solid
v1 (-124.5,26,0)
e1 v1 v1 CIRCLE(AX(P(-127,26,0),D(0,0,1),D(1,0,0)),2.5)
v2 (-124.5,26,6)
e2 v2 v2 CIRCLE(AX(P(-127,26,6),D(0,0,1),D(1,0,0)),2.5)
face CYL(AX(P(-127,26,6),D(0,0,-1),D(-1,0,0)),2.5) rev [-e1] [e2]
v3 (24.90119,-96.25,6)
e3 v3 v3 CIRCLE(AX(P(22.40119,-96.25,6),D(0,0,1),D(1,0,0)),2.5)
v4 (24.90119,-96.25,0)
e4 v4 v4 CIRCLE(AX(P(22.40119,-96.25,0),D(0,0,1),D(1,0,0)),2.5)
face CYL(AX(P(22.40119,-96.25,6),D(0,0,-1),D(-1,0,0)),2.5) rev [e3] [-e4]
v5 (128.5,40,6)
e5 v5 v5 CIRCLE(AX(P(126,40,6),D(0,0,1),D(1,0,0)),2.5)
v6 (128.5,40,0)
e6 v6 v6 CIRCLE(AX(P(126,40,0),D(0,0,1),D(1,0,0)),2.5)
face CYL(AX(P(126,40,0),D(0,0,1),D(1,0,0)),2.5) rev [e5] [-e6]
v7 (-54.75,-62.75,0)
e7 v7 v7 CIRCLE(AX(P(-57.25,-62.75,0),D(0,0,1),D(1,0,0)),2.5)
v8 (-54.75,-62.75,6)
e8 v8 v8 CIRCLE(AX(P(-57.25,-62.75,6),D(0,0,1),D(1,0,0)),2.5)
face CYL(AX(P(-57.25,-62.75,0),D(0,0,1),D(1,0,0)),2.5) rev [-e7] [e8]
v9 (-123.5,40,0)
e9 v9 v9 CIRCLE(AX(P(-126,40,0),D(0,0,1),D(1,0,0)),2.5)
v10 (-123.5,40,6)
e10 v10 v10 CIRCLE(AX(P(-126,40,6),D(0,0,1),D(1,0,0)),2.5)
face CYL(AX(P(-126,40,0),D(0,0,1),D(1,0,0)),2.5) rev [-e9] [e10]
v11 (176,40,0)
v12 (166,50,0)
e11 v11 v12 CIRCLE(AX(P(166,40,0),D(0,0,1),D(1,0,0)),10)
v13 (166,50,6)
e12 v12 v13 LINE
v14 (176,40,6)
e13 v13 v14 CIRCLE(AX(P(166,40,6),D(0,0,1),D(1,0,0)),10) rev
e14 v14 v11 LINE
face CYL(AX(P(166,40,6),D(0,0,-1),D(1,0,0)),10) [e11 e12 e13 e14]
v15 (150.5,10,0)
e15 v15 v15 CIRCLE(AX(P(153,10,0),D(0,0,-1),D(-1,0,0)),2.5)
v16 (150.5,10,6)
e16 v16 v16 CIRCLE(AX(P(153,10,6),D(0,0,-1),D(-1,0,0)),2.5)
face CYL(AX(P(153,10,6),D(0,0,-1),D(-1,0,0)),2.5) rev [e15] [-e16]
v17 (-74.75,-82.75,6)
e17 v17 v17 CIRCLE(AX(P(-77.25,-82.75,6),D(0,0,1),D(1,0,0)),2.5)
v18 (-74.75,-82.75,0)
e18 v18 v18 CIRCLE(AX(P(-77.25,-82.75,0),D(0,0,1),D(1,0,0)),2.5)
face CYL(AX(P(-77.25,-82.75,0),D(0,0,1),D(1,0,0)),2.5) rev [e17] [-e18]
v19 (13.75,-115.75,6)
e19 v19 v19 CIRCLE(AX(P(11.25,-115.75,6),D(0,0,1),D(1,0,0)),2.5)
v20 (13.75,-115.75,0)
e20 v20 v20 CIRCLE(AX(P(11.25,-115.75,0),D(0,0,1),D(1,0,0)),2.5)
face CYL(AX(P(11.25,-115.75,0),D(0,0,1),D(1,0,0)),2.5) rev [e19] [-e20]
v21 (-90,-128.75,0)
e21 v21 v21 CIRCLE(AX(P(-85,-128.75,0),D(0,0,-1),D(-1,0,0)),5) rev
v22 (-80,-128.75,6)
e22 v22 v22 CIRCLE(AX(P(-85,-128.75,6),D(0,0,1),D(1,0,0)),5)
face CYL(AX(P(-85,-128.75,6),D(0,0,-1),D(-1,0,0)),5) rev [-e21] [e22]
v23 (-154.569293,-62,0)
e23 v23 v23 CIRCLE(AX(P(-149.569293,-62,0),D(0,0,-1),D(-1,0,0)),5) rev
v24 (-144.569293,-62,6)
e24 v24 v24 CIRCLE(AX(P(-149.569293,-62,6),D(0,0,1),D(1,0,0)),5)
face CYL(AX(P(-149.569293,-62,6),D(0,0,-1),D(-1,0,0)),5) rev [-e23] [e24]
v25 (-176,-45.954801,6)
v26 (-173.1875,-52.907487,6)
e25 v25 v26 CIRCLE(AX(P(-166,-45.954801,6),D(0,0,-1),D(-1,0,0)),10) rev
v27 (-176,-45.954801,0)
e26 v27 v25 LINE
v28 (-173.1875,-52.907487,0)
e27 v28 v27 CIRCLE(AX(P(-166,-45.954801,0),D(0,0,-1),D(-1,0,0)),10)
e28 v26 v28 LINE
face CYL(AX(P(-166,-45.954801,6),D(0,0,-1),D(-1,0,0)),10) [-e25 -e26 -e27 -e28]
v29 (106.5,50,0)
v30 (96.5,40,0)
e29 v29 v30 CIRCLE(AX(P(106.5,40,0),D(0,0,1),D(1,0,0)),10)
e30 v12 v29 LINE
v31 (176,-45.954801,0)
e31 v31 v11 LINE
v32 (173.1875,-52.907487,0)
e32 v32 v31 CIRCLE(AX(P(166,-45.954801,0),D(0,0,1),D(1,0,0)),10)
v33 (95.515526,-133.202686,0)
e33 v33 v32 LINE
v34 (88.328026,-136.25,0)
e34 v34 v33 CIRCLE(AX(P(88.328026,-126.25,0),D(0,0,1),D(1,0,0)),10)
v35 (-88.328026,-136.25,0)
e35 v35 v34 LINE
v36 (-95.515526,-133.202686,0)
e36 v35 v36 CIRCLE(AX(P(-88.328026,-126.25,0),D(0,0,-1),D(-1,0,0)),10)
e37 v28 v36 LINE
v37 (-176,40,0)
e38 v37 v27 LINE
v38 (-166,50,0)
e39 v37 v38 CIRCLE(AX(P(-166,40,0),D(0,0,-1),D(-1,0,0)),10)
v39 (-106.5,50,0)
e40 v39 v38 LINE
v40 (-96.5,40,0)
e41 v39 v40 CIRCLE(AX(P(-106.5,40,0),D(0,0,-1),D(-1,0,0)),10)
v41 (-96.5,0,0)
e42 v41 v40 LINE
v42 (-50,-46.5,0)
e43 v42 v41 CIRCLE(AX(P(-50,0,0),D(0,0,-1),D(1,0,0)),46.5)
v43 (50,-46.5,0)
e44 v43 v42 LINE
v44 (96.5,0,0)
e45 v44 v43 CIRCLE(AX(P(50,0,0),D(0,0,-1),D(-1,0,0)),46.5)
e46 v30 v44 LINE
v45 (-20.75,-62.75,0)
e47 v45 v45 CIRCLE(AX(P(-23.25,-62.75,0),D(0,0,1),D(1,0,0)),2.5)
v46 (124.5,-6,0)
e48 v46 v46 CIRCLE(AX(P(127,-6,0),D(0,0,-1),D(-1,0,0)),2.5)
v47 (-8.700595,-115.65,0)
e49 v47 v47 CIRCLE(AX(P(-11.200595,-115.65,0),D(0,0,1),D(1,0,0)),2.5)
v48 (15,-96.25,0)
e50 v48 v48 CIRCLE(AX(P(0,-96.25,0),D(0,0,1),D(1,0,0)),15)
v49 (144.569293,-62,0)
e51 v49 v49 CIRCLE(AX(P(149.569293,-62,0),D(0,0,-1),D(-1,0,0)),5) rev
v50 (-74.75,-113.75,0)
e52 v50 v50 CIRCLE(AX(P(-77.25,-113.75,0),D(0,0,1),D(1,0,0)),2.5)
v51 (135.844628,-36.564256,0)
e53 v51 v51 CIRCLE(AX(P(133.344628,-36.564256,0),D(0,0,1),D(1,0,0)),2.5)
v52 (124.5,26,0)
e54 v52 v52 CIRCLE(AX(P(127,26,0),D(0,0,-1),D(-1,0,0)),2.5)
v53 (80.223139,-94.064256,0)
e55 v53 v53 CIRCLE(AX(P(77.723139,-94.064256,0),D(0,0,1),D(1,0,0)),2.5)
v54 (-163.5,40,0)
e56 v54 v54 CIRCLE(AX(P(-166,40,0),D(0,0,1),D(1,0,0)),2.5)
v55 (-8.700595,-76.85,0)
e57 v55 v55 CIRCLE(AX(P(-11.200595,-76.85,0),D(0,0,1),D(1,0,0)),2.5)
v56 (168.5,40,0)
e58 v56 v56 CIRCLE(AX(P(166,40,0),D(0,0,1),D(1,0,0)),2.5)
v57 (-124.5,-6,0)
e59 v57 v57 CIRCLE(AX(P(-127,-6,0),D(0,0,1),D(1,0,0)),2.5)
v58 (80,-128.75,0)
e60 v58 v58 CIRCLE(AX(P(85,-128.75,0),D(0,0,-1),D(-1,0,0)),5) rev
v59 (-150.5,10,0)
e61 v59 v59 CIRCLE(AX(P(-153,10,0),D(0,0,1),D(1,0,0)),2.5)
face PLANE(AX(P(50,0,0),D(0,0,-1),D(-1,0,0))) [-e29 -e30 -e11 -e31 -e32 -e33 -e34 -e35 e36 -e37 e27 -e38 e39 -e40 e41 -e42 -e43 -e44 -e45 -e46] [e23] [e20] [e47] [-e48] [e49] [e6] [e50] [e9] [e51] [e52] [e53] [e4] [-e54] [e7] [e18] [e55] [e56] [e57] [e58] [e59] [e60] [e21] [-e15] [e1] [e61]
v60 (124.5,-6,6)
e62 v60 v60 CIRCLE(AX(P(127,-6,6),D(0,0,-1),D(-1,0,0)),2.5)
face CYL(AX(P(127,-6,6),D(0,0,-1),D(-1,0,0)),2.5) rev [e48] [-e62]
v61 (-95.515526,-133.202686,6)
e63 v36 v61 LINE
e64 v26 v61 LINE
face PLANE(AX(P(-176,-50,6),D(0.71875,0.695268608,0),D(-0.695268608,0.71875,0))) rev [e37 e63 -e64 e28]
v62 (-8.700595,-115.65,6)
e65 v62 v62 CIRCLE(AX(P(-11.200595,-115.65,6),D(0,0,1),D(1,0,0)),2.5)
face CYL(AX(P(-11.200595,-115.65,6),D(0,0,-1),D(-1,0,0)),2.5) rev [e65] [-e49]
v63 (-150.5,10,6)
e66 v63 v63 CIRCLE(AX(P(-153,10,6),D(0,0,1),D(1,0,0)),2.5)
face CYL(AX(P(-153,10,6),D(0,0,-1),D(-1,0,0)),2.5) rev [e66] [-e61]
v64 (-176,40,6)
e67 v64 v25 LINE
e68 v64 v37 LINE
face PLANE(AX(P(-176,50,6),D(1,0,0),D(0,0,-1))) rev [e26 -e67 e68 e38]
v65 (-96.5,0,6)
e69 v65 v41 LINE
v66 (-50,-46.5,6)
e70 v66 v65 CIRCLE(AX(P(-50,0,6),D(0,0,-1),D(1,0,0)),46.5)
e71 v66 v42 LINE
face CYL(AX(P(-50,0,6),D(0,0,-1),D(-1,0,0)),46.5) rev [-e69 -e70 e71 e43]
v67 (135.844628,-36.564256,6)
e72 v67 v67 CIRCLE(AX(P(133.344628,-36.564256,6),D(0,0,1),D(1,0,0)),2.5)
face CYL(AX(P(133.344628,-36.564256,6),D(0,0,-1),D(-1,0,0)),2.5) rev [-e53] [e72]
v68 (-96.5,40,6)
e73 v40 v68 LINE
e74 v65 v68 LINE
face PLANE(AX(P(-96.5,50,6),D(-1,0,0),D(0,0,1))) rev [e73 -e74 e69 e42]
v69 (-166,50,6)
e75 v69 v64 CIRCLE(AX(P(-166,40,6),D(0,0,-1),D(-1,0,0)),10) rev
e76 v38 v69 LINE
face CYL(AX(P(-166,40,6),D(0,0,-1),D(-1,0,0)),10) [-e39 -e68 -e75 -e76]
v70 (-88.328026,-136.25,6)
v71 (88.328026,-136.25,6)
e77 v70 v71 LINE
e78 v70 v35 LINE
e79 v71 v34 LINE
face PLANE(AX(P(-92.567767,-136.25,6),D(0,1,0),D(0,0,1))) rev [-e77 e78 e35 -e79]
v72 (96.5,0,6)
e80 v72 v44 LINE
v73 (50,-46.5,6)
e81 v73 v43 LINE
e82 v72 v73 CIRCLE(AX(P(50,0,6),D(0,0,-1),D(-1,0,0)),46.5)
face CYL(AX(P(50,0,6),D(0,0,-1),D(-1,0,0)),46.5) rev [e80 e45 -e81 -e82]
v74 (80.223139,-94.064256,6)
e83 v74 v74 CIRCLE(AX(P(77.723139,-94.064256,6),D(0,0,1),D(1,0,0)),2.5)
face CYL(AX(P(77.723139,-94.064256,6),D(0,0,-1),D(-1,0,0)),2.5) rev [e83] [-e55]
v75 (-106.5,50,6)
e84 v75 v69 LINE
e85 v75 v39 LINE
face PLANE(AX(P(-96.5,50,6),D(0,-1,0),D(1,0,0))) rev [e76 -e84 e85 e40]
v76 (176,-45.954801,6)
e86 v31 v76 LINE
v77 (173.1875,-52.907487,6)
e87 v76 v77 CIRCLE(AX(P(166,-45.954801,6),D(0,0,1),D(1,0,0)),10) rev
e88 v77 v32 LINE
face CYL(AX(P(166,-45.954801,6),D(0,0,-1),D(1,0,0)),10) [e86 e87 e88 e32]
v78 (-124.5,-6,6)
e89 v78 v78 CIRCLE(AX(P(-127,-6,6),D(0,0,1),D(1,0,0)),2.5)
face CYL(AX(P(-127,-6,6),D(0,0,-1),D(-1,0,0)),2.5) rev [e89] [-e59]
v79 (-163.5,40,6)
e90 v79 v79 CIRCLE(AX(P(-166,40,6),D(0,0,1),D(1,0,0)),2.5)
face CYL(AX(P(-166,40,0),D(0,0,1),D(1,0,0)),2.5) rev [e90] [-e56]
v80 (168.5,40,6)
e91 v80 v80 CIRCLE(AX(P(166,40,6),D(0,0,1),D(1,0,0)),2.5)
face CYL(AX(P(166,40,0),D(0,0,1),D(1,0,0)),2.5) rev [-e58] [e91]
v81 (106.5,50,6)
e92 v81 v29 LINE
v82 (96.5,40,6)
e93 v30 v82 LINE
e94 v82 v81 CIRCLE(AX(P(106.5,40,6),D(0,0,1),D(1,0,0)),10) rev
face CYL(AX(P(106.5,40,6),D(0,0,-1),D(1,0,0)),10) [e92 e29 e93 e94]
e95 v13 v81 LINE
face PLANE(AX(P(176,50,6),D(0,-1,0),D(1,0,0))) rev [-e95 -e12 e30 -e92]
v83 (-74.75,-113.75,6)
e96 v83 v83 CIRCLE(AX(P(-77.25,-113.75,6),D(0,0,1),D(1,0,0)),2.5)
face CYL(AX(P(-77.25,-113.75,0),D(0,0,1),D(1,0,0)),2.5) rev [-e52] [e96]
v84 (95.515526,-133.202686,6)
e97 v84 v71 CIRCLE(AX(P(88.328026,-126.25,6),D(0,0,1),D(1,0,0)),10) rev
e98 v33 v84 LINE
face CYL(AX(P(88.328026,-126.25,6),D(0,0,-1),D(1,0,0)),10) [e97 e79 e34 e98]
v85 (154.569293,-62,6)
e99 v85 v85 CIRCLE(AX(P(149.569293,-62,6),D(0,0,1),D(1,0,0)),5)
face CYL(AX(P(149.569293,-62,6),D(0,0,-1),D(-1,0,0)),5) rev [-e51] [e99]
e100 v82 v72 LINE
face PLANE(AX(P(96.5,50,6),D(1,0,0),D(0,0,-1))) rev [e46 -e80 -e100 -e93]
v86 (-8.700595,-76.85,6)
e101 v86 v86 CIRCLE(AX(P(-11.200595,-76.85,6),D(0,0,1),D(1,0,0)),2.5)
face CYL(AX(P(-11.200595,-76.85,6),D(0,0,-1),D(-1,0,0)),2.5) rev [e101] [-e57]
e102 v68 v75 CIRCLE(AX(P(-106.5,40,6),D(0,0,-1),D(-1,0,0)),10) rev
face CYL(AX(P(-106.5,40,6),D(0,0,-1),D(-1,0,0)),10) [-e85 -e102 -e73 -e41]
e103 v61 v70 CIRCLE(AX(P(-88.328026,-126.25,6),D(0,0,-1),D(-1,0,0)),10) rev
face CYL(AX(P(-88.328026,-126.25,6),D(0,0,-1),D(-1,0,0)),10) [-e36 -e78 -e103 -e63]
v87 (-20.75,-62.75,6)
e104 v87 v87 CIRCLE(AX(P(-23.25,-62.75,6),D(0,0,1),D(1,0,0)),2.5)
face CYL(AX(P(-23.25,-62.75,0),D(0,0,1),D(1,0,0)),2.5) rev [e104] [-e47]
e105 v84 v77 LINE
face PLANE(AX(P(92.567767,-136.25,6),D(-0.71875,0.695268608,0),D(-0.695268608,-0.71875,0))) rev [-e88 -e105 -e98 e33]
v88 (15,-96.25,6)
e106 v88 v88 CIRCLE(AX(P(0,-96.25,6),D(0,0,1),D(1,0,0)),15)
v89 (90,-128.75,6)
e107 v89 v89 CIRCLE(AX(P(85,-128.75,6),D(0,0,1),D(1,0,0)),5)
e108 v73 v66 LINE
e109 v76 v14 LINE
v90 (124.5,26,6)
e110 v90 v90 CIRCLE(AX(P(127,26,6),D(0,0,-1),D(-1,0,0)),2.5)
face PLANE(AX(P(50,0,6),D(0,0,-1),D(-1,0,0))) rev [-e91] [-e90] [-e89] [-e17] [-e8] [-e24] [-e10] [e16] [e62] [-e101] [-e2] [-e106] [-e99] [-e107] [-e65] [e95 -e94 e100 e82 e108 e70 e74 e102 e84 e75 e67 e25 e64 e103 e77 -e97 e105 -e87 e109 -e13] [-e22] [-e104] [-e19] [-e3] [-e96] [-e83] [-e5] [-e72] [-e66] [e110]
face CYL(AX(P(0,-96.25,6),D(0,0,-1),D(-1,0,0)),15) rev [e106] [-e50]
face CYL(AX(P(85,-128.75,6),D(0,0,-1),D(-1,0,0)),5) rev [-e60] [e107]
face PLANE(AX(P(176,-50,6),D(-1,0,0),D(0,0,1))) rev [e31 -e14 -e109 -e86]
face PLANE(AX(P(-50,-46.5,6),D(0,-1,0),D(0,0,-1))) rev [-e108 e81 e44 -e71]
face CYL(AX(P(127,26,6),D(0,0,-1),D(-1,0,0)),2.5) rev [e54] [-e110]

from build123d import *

# Parameters (mm, degrees)
BASE_DEPTH                    = 6
ESQUISSE10_R                  = 2.5
STEP_DEPTH                    = 223.656826754
ESQUISSE11_R                  = 15
ESQUISSE11_R_2                = 2.5
ENL_V_MAT_EXTRU_4_DEPTH       = 223.656826754
ESQUISSE12_R                  = 2.5
ENL_V_MAT_EXTRU_5_DEPTH       = 223.656826754
ESQUISSE14_R                  = 2.5
ENL_V_MAT_EXTRU_6_DEPTH       = 223.656826754
ESQUISSE15_R                  = 2.5
ENL_V_MAT_EXTRU_7_DEPTH       = 223.656826754
CONG_1_R                      = 10
SYM_TRIE4_DEPTH               = 6
ENL_V_MAT_EXTRU_13_DEPTH      = 223.656826754
ENL_V_MAT_EXTRU_13_DEPTH_BACK = 10
ESQUISSE16_R                  = 5


# Read off the part's stored shape, not the designer's step: Symétrie4
with BuildPart() as part:
    # Esquisse4 → Base (new body)
    with BuildSketch(Plane.XY):
        with BuildLine():
            Line((-176, 50), (-176, -50))
            Line((-176, -50), (-92.56776702, -136.25))
            Line((-92.56776702, -136.25), (92.56776702, -136.25))
            Line((92.56776702, -136.25), (176, -50))
            Line((176, -50), (176, 50))
            Line((176, 50), (96.5, 50))
            Line((96.5, 50), (96.5, 0))
            ThreePointArc((96.5, 0), (82.880465325, -32.880465325), (50, -46.5))
            Line((50, -46.5), (-50, -46.5))
            ThreePointArc((-50, -46.5), (-82.880465325, -32.880465325), (-96.5, 0))
            Line((-96.5, 0), (-96.5, 50))
            Line((-96.5, 50), (-176, 50))
        make_face()
    extrude(amount=BASE_DEPTH)

    # Esquisse10 → Step (cut, through all)
    with BuildSketch(Plane.XY):
        with Locations((-127, 26)):
            Circle(ESQUISSE10_R)
        with Locations((-153, 10)):
            Circle(ESQUISSE10_R)
        with Locations((-127, -6)):
            Circle(ESQUISSE10_R)
    step = extrude(amount=STEP_DEPTH, mode=Mode.SUBTRACT)

    # Step2: Step across plane
    add(step.mirror(Plane(origin=(0, 0, 0), x_dir=(0, 0, 1), z_dir=(1, 0, 0))), mode=Mode.SUBTRACT)

    # Esquisse11 → Enlèv. mat.-Extru.4 (cut, through all)
    with BuildSketch(Plane.XY):
        with Locations((0, -96.25)):
            Circle(ESQUISSE11_R)
        with Locations((-11.200595222, -76.85)):
            Circle(ESQUISSE11_R_2)
        with Locations((-11.200595222, -115.65)):
            Circle(ESQUISSE11_R_2)
        with Locations((22.401190445, -96.25)):
            Circle(ESQUISSE11_R_2)
    extrude(amount=ENL_V_MAT_EXTRU_4_DEPTH, mode=Mode.SUBTRACT)

    # Esquisse12 → Enlèv. mat.-Extru.5 (cut, through all)
    with BuildSketch(Plane.XY.offset(6)):
        with Locations((-77.25, -113.75)):
            Circle(ESQUISSE12_R)
        with Locations((-77.25, -82.75)):
            Circle(ESQUISSE12_R)
        with Locations((-57.25, -62.75)):
            Circle(ESQUISSE12_R)
        with Locations((-23.25, -62.75)):
            Circle(ESQUISSE12_R)
        with Locations((11.25, -115.75)):
            Circle(ESQUISSE12_R)
    extrude(amount=-ENL_V_MAT_EXTRU_5_DEPTH, mode=Mode.SUBTRACT)

    # Esquisse14 → Enlèv. mat.-Extru.6 (cut, through all)
    with BuildSketch(Plane.XY):
        with Locations((77.723139183, -94.064255673)):
            Circle(ESQUISSE14_R)
        with Locations((133.344627837, -36.564255673)):
            Circle(ESQUISSE14_R)
    extrude(amount=ENL_V_MAT_EXTRU_6_DEPTH, mode=Mode.SUBTRACT)

    # Esquisse15 → Enlèv. mat.-Extru.7 (cut, through all)
    with BuildSketch(Plane.XY.offset(6)):
        with Locations((-166, 40)):
            Circle(ESQUISSE15_R)
        with Locations((-126, 40)):
            Circle(ESQUISSE15_R)
        with Locations((126, 40)):
            Circle(ESQUISSE15_R)
        with Locations((166, 40)):
            Circle(ESQUISSE15_R)
    extrude(amount=-ENL_V_MAT_EXTRU_7_DEPTH, mode=Mode.SUBTRACT)

    # Congé1
    cong_1_edges = [part.edges().sort_by_distance(p)[0] for p in [
        (-96.5, 50, 3),
        (-92.56776702, -136.25, 3),
        (-176, -50, 3),
        (-176, 50, 3),
    ]]
    fillet(cong_1_edges, radius=CONG_1_R)

    # Symétrie4 outline → Symétrie4 (cut)
    with BuildSketch(Plane.XY):
        with BuildLine():
            Line((176, -50), (176, -45.954800825))
            ThreePointArc((176, -45.954800825), (175.270248109, -49.704800825), (173.1875, -52.907486907))
            Line((173.1875, -52.907486907), (176, -50))
        make_face()
        with BuildLine():
            ThreePointArc((96.5, 40), (99.428932188, 47.071067812), (106.5, 50))
            Line((106.5, 50), (96.5, 50))
            Line((96.5, 50), (96.5, 40))
        make_face()
        with BuildLine():
            ThreePointArc((166, 50), (173.071067812, 47.071067812), (176, 40))
            Line((176, 40), (176, 50))
            Line((176, 50), (166, 50))
        make_face()
        with BuildLine():
            Line((92.56776702, -136.25), (95.515525916, -133.202686082))
            ThreePointArc((95.515525916, -133.202686082), (92.231430788, -135.456705731), (88.328025916, -136.25))
            Line((88.328025916, -136.25), (92.56776702, -136.25))
        make_face()
    extrude(amount=SYM_TRIE4_DEPTH, mode=Mode.SUBTRACT)

    # Esquisse16 → Enlèv. mat.-Extru.13 (cut, two sides: drawn at the far end of the back side and taken through both)
    with BuildSketch(Plane.XY.offset(-ENL_V_MAT_EXTRU_13_DEPTH_BACK)):
        with Locations(Location((-85, -128.75, 0), (0, 0, 180))):
            Circle(ESQUISSE16_R)
        with Locations(Location((85, -128.75, 0), (0, 0, 180))):
            Circle(ESQUISSE16_R)
        with Locations(Location((-149.56929335, -62, 0), (0, 0, 180))):
            Circle(ESQUISSE16_R)
        with Locations(Location((149.56929335, -62, 0), (0, 0, 180))):
            Circle(ESQUISSE16_R)
    extrude(amount=ENL_V_MAT_EXTRU_13_DEPTH + ENL_V_MAT_EXTRU_13_DEPTH_BACK, mode=Mode.SUBTRACT)


solid = part.part
